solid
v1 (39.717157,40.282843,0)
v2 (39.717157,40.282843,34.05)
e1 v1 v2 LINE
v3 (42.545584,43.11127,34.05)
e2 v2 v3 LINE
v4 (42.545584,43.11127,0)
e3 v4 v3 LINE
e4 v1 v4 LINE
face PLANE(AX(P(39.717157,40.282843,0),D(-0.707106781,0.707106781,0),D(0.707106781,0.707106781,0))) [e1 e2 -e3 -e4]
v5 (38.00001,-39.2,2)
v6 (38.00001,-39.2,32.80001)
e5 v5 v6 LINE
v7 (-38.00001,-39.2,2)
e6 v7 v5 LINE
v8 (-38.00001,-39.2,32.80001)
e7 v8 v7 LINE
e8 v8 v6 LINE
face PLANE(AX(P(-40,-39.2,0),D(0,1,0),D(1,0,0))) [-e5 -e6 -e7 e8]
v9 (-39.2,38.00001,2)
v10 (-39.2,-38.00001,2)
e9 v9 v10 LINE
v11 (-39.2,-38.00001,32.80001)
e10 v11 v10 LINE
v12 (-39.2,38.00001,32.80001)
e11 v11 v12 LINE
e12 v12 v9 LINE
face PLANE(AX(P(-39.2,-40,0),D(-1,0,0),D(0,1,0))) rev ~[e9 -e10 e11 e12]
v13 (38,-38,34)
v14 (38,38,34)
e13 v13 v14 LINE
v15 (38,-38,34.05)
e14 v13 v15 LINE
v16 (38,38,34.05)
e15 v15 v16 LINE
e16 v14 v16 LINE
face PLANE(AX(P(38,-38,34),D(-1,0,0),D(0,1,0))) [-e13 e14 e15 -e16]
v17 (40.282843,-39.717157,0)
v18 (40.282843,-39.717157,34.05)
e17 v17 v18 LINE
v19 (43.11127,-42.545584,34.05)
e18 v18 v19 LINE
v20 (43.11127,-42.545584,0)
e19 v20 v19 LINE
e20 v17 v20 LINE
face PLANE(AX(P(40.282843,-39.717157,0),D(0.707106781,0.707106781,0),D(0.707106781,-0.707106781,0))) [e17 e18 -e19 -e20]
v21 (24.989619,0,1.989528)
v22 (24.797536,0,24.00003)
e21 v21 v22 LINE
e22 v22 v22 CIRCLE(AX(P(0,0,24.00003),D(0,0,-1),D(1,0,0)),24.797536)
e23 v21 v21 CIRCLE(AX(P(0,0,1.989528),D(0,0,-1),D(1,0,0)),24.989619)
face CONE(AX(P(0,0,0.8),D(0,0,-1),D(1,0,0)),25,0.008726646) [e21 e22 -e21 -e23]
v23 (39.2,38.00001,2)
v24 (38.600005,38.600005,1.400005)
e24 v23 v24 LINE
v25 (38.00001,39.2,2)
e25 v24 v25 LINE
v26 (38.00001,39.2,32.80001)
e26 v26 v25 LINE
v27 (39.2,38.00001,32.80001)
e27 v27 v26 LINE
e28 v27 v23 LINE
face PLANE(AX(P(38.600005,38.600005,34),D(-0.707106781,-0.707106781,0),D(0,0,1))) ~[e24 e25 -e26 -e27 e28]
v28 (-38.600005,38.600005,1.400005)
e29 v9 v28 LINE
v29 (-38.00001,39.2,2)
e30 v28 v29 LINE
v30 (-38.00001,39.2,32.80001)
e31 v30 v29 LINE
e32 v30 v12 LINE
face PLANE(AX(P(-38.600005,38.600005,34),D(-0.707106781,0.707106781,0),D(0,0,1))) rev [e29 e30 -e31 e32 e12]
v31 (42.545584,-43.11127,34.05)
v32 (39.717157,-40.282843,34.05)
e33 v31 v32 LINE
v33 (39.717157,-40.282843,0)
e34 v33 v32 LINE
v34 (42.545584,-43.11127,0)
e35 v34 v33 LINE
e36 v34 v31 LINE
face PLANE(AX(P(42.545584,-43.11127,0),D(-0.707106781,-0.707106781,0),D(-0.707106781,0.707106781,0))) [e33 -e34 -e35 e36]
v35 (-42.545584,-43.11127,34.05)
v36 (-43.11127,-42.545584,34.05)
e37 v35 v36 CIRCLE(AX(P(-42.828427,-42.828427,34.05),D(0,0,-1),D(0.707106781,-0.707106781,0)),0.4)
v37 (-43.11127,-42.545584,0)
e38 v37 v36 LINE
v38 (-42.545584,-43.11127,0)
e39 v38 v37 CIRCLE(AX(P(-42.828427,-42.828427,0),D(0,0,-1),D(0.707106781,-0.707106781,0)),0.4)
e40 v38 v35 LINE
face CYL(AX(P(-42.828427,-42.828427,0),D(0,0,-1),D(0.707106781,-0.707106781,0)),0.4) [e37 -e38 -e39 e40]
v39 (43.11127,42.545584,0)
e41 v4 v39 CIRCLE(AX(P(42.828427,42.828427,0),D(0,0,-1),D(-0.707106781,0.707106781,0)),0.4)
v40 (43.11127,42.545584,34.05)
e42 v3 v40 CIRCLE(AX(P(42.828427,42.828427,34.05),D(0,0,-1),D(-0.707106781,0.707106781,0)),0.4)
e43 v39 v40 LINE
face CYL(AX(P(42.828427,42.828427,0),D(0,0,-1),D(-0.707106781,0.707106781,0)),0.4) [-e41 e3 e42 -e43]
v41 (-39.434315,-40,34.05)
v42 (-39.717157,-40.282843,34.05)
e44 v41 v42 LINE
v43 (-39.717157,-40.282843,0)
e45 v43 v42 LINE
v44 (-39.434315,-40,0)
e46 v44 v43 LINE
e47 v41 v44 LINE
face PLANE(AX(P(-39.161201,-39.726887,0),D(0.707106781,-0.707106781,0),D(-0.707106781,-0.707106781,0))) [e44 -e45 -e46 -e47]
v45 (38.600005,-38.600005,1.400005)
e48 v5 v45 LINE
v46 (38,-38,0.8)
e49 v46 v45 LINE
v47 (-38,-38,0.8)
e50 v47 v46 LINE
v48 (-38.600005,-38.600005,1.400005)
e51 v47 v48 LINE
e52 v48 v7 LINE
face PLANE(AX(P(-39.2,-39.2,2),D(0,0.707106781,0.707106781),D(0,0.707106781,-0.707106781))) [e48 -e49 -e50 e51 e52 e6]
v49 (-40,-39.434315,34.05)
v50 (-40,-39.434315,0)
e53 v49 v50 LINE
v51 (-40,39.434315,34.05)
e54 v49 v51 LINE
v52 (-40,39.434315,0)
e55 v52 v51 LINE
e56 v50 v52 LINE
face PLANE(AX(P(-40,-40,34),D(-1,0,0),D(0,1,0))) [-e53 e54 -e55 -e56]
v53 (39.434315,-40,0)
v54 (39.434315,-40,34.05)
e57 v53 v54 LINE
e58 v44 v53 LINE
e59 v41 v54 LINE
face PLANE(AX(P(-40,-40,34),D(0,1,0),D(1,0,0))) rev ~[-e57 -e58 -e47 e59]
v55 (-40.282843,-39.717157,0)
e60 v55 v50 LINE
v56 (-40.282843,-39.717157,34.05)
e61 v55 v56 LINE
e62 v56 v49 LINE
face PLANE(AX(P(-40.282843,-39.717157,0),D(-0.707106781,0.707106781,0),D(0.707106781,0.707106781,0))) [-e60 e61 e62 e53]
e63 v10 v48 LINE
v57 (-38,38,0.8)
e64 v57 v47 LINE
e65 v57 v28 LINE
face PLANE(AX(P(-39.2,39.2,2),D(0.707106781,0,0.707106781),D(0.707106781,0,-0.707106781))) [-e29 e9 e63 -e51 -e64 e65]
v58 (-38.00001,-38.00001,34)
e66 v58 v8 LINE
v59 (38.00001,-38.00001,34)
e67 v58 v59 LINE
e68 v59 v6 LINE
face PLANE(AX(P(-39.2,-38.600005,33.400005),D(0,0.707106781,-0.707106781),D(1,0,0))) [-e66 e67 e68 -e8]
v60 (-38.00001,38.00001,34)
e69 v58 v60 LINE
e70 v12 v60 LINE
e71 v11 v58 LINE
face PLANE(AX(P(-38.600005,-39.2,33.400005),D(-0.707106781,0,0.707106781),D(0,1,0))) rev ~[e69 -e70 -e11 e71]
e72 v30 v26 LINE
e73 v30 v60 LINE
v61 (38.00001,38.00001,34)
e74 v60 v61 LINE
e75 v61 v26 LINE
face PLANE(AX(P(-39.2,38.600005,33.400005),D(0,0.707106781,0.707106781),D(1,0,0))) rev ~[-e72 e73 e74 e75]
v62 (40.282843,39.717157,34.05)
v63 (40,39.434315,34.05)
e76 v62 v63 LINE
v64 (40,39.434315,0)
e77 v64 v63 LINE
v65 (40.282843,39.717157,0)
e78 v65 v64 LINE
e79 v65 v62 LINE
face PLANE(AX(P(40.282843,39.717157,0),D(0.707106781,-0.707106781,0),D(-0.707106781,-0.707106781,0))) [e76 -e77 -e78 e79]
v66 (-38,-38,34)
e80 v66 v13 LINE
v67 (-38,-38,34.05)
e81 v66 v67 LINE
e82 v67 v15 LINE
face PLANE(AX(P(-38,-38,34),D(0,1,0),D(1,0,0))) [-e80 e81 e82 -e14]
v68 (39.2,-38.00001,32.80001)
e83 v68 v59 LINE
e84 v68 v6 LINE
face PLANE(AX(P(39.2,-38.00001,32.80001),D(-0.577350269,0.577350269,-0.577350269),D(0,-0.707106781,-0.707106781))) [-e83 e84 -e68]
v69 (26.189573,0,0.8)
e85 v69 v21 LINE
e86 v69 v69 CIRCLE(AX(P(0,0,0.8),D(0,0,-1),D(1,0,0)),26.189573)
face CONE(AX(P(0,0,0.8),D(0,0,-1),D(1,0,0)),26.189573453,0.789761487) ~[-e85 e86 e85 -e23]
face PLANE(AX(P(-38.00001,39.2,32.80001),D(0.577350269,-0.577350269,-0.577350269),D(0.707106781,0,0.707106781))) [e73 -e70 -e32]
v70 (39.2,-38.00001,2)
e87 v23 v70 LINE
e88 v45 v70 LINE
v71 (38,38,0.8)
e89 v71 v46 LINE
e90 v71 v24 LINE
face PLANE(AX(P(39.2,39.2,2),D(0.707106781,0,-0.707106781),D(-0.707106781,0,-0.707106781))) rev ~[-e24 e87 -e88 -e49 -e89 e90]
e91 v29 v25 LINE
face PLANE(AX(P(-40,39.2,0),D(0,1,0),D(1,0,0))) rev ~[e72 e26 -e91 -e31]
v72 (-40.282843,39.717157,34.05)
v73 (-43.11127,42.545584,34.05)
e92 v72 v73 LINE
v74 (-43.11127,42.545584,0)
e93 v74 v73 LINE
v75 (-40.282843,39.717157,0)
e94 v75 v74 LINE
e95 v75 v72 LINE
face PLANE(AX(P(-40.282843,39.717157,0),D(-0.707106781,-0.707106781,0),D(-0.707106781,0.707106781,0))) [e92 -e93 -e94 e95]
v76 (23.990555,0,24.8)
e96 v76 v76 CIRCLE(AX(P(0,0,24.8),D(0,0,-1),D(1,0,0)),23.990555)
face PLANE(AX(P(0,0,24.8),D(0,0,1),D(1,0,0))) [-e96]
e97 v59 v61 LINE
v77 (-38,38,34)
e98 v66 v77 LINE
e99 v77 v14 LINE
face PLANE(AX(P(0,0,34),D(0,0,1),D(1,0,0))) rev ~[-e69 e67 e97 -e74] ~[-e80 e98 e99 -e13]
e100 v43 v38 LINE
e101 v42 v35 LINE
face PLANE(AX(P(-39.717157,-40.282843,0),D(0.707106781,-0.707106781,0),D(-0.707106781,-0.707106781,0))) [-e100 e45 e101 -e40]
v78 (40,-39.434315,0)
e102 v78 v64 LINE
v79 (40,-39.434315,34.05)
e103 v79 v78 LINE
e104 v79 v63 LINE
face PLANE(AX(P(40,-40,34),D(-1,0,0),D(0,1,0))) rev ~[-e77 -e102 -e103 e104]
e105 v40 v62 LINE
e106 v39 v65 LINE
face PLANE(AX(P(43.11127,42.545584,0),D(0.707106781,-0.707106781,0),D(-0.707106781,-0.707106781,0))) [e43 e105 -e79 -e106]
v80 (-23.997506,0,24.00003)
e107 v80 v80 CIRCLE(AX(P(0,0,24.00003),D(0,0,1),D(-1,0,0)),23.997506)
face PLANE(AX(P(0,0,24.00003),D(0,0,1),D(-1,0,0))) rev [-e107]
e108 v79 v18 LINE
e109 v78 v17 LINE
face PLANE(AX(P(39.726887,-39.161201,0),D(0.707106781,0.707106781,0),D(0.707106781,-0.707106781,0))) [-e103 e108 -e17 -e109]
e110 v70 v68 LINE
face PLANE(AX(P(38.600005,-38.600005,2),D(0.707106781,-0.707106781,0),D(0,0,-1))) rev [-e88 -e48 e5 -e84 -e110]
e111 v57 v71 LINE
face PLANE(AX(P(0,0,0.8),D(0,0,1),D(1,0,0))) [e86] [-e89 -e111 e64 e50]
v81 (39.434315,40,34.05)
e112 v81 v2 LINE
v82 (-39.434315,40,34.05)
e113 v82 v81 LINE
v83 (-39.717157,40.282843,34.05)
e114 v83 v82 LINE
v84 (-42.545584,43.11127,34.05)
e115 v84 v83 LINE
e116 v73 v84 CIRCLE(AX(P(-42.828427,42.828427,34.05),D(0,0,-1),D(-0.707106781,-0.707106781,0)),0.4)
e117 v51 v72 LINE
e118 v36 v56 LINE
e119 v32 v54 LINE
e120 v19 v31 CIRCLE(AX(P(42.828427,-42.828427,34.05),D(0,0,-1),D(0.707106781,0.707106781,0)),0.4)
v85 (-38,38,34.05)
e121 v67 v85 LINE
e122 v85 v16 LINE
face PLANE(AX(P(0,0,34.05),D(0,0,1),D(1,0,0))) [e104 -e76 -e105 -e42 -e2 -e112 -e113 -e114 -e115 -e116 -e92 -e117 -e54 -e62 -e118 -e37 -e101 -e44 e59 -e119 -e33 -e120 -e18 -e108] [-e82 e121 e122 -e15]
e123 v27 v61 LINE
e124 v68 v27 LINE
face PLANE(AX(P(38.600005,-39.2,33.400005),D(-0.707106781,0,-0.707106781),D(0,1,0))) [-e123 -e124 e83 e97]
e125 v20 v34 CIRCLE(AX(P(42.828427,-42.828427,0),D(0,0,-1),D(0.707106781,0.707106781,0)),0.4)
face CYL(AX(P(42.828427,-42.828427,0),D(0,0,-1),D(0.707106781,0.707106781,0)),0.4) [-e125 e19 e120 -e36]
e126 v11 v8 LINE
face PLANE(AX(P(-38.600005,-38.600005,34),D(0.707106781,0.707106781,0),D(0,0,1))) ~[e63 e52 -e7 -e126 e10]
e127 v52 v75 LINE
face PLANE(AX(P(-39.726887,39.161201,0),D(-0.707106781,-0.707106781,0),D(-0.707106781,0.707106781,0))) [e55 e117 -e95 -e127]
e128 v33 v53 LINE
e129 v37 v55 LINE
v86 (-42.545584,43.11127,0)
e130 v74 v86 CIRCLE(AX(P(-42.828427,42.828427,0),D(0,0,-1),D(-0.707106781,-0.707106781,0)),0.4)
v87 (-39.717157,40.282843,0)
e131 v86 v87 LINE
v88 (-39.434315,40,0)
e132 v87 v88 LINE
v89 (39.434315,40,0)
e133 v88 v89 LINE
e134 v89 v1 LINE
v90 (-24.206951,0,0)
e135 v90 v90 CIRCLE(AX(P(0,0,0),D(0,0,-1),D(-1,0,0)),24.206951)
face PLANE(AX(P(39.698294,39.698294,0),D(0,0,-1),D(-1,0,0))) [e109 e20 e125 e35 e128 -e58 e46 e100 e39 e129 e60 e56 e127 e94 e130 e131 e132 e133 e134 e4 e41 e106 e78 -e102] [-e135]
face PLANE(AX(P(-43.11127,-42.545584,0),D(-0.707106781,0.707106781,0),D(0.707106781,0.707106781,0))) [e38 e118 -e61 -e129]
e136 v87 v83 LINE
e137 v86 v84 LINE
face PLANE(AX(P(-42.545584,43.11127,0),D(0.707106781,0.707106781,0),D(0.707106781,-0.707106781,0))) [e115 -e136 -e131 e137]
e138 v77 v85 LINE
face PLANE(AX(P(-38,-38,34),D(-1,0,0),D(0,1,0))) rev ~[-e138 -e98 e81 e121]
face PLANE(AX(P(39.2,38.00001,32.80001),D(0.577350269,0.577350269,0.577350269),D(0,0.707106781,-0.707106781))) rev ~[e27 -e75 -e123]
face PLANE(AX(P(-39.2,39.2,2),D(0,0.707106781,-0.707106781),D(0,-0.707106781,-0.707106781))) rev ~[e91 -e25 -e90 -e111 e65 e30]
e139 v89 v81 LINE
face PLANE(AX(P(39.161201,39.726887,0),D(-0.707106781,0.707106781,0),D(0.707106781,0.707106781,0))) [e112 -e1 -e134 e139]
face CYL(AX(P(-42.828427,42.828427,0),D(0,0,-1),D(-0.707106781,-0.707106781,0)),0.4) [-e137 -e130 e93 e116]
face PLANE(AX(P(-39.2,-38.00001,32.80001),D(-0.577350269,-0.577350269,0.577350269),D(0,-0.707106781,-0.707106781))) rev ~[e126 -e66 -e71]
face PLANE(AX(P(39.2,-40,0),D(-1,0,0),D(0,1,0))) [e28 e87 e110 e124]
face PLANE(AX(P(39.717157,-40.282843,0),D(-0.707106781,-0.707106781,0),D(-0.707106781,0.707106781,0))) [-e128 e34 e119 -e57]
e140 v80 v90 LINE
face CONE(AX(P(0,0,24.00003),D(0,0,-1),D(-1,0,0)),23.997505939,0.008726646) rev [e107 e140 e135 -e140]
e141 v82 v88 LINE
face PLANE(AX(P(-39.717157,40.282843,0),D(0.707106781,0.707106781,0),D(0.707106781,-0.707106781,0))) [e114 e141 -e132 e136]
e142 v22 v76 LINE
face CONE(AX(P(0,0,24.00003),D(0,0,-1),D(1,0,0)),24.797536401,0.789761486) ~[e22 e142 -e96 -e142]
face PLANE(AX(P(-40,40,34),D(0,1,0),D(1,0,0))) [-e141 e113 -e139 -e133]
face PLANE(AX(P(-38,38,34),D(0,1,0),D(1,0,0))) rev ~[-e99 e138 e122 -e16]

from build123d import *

# Parameters (mm, degrees)
F0_W             = 80
F0_H             = 80
F1_DEPTH         = 34
F2_T             = -0.8
F3_R             = 25
F4_DEPTH         = 24
F4_TAPER         = 0.5
F5_T1_DEPTH      = 78.4
F5_T3_DEPTH      = 78.4
F6_W             = 80
F6_H             = 80
F6_W_2           = 76
F6_H_2           = 76
F7_DEPTH         = 0.05
F8_SIZE          = 1.19999
F11_DEPTH        = 34.05
F11_COPIES_COUNT = 4


# Not quite as in the source:
# - a fillet or chamfer that OpenCascade refuses, or shapes differently, is made with other operations: its cross-section is extruded or revolved along the edge and cut away or added
# - a fillet or chamfer is up to 0.001 mm smaller than in the source, because OpenCascade refuses the exact size
# - a pattern or mirror of a feature is missing from the dataset's text; its kind, count and spacing are read off the source's solid


with BuildPart() as f1:
    # F0 (on Top) → F1 (new body)
    with BuildSketch(Plane.XY):
        Rectangle(F0_W, F0_H)
    extrude(amount=F1_DEPTH)

    # F2
    f2_openings = [f1.faces().sort_by_distance(p)[0] for p in [
        (0, 0, 34),
    ]]
    offset(amount=F2_T, openings=f2_openings)

    # F3 (on face) → F4 (join)
    with BuildSketch(Plane.XY.offset(0.8)):
        Circle(F3_R)
    extrude(amount=F4_DEPTH, taper=F4_TAPER)

    # F5: chamfer of 1.2 on 5 edges, made by hand

    # F5_s2 → F5_t1 (join)
    with BuildSketch(Plane.XZ.offset(-39.2)):
        Polygon((-39.2, 2), (-38, 0.8), (-39.2, 0.8), align=None)
        Polygon((39.2, 2), (38, 0.8), (39.2, 0.8), align=None)
    extrude(amount=F5_T1_DEPTH)

    # F5_s4 → F5_t3 (join)
    with BuildSketch(Plane.YZ.offset(-39.2)):
        Polygon((-39.2, 2), (-38, 0.8), (-39.2, 0.8), align=None)
        Polygon((39.2, 2), (38, 0.8), (39.2, 0.8), align=None)
    extrude(amount=F5_T3_DEPTH)

    # F5_s5 → F5_t6 (revolve)
    with BuildSketch(Plane.XZ):
        Polygon((26.1895734527, 0.8), (24.989619145, 1.9895281574), (25, 0.8), align=None)
    revolve(axis=Axis((0, 0, 0.8), (0, 0, -1)))

    # F6 (on face) → F7 (join)
    with BuildSketch(Plane.XY.offset(34)):
        Rectangle(F6_W, F6_H)
        Rectangle(F6_W_2, F6_H_2, mode=Mode.SUBTRACT)
    extrude(amount=F7_DEPTH)

    # F8 (size 1.2 in the source; OpenCascade refuses exactly that, so slightly less here)
    f8_edges = [f1.edges().sort_by_distance(p)[0] for p in [
        (0, -39.2, 34),
        (-39.2, 0, 34),
        (-39.2, -39.2, 18),
        (-39.2, 39.2, 18),
        (0, 39.2, 34),
        (39.2, 0, 34),
        (39.2, 39.2, 18),
        (39.2, -39.2, 18),
    ]]
    chamfer(f8_edges, length=F8_SIZE)

    # F9: chamfer of 0.8 on 1 edges, made by hand

    # F9_s1 → F9_t2 (revolve, cut)
    with BuildSketch(Plane.XZ):
        Polygon((24.7975364014, 24.0000304615), (23.990555173, 24.8), (24.790555173, 24.8), align=None)
    revolve(axis=Axis((0, 0, 24.8), (0, 0, -1)), mode=Mode.SUBTRACT)

    # F10 (on face) → F11 (join, through all)
    with BuildSketch(Plane(origin=(0, 0, 0), x_dir=(1, 0, 0), z_dir=(0, 0, -1))):
        with BuildLine():
            Line((-39.1612012219, 39.7268866468), (-39.7171572875, 40.2828427125))
            ThreePointArc((-39.7171572875, 40.2828427125), (-39.7171572875, 39.7171572875), (-40.2828427125, 39.7171572875))
            Line((-40.2828427125, 39.7171572875), (-39.7268866468, 39.1612012219))
            Line((-39.7268866468, 39.1612012219), (-39.1612012219, 39.7268866468))
        make_face()
        with BuildLine():
            ThreePointArc((-40.2828427125, 39.7171572875), (-39.7171572875, 39.7171572875), (-39.7171572875, 40.2828427125))
            Line((-39.7171572875, 40.2828427125), (-42.5455844123, 43.1112698372))
            ThreePointArc((-42.5455844123, 43.1112698372), (-43.1112698372, 43.1112698372), (-43.1112698372, 42.5455844123))
            Line((-43.1112698372, 42.5455844123), (-40.2828427125, 39.7171572875))
        make_face()
    f11 = extrude(amount=-F11_DEPTH)

    # F11_copies: F11 ×4 about axis
    f11_copies_axis = Axis((0, 0, 0), (0, 0, 1))
    for i in range(1, F11_COPIES_COUNT):
        add(f11.rotate(f11_copies_axis, i * 360 / F11_COPIES_COUNT))

    # F12 (on Front) → F13 (revolve, cut)
    with BuildSketch(Plane.XZ):
        Polygon((-23.9975059387, 24.0000304615), (-24.2264749318, -2.2372173829), (0, -2.2372173829), (0, 24.0000304615), align=None)
    revolve(axis=Axis((0, 0, 10.8814065393), (0, 0, 1)), mode=Mode.SUBTRACT)


solid = f1.part
